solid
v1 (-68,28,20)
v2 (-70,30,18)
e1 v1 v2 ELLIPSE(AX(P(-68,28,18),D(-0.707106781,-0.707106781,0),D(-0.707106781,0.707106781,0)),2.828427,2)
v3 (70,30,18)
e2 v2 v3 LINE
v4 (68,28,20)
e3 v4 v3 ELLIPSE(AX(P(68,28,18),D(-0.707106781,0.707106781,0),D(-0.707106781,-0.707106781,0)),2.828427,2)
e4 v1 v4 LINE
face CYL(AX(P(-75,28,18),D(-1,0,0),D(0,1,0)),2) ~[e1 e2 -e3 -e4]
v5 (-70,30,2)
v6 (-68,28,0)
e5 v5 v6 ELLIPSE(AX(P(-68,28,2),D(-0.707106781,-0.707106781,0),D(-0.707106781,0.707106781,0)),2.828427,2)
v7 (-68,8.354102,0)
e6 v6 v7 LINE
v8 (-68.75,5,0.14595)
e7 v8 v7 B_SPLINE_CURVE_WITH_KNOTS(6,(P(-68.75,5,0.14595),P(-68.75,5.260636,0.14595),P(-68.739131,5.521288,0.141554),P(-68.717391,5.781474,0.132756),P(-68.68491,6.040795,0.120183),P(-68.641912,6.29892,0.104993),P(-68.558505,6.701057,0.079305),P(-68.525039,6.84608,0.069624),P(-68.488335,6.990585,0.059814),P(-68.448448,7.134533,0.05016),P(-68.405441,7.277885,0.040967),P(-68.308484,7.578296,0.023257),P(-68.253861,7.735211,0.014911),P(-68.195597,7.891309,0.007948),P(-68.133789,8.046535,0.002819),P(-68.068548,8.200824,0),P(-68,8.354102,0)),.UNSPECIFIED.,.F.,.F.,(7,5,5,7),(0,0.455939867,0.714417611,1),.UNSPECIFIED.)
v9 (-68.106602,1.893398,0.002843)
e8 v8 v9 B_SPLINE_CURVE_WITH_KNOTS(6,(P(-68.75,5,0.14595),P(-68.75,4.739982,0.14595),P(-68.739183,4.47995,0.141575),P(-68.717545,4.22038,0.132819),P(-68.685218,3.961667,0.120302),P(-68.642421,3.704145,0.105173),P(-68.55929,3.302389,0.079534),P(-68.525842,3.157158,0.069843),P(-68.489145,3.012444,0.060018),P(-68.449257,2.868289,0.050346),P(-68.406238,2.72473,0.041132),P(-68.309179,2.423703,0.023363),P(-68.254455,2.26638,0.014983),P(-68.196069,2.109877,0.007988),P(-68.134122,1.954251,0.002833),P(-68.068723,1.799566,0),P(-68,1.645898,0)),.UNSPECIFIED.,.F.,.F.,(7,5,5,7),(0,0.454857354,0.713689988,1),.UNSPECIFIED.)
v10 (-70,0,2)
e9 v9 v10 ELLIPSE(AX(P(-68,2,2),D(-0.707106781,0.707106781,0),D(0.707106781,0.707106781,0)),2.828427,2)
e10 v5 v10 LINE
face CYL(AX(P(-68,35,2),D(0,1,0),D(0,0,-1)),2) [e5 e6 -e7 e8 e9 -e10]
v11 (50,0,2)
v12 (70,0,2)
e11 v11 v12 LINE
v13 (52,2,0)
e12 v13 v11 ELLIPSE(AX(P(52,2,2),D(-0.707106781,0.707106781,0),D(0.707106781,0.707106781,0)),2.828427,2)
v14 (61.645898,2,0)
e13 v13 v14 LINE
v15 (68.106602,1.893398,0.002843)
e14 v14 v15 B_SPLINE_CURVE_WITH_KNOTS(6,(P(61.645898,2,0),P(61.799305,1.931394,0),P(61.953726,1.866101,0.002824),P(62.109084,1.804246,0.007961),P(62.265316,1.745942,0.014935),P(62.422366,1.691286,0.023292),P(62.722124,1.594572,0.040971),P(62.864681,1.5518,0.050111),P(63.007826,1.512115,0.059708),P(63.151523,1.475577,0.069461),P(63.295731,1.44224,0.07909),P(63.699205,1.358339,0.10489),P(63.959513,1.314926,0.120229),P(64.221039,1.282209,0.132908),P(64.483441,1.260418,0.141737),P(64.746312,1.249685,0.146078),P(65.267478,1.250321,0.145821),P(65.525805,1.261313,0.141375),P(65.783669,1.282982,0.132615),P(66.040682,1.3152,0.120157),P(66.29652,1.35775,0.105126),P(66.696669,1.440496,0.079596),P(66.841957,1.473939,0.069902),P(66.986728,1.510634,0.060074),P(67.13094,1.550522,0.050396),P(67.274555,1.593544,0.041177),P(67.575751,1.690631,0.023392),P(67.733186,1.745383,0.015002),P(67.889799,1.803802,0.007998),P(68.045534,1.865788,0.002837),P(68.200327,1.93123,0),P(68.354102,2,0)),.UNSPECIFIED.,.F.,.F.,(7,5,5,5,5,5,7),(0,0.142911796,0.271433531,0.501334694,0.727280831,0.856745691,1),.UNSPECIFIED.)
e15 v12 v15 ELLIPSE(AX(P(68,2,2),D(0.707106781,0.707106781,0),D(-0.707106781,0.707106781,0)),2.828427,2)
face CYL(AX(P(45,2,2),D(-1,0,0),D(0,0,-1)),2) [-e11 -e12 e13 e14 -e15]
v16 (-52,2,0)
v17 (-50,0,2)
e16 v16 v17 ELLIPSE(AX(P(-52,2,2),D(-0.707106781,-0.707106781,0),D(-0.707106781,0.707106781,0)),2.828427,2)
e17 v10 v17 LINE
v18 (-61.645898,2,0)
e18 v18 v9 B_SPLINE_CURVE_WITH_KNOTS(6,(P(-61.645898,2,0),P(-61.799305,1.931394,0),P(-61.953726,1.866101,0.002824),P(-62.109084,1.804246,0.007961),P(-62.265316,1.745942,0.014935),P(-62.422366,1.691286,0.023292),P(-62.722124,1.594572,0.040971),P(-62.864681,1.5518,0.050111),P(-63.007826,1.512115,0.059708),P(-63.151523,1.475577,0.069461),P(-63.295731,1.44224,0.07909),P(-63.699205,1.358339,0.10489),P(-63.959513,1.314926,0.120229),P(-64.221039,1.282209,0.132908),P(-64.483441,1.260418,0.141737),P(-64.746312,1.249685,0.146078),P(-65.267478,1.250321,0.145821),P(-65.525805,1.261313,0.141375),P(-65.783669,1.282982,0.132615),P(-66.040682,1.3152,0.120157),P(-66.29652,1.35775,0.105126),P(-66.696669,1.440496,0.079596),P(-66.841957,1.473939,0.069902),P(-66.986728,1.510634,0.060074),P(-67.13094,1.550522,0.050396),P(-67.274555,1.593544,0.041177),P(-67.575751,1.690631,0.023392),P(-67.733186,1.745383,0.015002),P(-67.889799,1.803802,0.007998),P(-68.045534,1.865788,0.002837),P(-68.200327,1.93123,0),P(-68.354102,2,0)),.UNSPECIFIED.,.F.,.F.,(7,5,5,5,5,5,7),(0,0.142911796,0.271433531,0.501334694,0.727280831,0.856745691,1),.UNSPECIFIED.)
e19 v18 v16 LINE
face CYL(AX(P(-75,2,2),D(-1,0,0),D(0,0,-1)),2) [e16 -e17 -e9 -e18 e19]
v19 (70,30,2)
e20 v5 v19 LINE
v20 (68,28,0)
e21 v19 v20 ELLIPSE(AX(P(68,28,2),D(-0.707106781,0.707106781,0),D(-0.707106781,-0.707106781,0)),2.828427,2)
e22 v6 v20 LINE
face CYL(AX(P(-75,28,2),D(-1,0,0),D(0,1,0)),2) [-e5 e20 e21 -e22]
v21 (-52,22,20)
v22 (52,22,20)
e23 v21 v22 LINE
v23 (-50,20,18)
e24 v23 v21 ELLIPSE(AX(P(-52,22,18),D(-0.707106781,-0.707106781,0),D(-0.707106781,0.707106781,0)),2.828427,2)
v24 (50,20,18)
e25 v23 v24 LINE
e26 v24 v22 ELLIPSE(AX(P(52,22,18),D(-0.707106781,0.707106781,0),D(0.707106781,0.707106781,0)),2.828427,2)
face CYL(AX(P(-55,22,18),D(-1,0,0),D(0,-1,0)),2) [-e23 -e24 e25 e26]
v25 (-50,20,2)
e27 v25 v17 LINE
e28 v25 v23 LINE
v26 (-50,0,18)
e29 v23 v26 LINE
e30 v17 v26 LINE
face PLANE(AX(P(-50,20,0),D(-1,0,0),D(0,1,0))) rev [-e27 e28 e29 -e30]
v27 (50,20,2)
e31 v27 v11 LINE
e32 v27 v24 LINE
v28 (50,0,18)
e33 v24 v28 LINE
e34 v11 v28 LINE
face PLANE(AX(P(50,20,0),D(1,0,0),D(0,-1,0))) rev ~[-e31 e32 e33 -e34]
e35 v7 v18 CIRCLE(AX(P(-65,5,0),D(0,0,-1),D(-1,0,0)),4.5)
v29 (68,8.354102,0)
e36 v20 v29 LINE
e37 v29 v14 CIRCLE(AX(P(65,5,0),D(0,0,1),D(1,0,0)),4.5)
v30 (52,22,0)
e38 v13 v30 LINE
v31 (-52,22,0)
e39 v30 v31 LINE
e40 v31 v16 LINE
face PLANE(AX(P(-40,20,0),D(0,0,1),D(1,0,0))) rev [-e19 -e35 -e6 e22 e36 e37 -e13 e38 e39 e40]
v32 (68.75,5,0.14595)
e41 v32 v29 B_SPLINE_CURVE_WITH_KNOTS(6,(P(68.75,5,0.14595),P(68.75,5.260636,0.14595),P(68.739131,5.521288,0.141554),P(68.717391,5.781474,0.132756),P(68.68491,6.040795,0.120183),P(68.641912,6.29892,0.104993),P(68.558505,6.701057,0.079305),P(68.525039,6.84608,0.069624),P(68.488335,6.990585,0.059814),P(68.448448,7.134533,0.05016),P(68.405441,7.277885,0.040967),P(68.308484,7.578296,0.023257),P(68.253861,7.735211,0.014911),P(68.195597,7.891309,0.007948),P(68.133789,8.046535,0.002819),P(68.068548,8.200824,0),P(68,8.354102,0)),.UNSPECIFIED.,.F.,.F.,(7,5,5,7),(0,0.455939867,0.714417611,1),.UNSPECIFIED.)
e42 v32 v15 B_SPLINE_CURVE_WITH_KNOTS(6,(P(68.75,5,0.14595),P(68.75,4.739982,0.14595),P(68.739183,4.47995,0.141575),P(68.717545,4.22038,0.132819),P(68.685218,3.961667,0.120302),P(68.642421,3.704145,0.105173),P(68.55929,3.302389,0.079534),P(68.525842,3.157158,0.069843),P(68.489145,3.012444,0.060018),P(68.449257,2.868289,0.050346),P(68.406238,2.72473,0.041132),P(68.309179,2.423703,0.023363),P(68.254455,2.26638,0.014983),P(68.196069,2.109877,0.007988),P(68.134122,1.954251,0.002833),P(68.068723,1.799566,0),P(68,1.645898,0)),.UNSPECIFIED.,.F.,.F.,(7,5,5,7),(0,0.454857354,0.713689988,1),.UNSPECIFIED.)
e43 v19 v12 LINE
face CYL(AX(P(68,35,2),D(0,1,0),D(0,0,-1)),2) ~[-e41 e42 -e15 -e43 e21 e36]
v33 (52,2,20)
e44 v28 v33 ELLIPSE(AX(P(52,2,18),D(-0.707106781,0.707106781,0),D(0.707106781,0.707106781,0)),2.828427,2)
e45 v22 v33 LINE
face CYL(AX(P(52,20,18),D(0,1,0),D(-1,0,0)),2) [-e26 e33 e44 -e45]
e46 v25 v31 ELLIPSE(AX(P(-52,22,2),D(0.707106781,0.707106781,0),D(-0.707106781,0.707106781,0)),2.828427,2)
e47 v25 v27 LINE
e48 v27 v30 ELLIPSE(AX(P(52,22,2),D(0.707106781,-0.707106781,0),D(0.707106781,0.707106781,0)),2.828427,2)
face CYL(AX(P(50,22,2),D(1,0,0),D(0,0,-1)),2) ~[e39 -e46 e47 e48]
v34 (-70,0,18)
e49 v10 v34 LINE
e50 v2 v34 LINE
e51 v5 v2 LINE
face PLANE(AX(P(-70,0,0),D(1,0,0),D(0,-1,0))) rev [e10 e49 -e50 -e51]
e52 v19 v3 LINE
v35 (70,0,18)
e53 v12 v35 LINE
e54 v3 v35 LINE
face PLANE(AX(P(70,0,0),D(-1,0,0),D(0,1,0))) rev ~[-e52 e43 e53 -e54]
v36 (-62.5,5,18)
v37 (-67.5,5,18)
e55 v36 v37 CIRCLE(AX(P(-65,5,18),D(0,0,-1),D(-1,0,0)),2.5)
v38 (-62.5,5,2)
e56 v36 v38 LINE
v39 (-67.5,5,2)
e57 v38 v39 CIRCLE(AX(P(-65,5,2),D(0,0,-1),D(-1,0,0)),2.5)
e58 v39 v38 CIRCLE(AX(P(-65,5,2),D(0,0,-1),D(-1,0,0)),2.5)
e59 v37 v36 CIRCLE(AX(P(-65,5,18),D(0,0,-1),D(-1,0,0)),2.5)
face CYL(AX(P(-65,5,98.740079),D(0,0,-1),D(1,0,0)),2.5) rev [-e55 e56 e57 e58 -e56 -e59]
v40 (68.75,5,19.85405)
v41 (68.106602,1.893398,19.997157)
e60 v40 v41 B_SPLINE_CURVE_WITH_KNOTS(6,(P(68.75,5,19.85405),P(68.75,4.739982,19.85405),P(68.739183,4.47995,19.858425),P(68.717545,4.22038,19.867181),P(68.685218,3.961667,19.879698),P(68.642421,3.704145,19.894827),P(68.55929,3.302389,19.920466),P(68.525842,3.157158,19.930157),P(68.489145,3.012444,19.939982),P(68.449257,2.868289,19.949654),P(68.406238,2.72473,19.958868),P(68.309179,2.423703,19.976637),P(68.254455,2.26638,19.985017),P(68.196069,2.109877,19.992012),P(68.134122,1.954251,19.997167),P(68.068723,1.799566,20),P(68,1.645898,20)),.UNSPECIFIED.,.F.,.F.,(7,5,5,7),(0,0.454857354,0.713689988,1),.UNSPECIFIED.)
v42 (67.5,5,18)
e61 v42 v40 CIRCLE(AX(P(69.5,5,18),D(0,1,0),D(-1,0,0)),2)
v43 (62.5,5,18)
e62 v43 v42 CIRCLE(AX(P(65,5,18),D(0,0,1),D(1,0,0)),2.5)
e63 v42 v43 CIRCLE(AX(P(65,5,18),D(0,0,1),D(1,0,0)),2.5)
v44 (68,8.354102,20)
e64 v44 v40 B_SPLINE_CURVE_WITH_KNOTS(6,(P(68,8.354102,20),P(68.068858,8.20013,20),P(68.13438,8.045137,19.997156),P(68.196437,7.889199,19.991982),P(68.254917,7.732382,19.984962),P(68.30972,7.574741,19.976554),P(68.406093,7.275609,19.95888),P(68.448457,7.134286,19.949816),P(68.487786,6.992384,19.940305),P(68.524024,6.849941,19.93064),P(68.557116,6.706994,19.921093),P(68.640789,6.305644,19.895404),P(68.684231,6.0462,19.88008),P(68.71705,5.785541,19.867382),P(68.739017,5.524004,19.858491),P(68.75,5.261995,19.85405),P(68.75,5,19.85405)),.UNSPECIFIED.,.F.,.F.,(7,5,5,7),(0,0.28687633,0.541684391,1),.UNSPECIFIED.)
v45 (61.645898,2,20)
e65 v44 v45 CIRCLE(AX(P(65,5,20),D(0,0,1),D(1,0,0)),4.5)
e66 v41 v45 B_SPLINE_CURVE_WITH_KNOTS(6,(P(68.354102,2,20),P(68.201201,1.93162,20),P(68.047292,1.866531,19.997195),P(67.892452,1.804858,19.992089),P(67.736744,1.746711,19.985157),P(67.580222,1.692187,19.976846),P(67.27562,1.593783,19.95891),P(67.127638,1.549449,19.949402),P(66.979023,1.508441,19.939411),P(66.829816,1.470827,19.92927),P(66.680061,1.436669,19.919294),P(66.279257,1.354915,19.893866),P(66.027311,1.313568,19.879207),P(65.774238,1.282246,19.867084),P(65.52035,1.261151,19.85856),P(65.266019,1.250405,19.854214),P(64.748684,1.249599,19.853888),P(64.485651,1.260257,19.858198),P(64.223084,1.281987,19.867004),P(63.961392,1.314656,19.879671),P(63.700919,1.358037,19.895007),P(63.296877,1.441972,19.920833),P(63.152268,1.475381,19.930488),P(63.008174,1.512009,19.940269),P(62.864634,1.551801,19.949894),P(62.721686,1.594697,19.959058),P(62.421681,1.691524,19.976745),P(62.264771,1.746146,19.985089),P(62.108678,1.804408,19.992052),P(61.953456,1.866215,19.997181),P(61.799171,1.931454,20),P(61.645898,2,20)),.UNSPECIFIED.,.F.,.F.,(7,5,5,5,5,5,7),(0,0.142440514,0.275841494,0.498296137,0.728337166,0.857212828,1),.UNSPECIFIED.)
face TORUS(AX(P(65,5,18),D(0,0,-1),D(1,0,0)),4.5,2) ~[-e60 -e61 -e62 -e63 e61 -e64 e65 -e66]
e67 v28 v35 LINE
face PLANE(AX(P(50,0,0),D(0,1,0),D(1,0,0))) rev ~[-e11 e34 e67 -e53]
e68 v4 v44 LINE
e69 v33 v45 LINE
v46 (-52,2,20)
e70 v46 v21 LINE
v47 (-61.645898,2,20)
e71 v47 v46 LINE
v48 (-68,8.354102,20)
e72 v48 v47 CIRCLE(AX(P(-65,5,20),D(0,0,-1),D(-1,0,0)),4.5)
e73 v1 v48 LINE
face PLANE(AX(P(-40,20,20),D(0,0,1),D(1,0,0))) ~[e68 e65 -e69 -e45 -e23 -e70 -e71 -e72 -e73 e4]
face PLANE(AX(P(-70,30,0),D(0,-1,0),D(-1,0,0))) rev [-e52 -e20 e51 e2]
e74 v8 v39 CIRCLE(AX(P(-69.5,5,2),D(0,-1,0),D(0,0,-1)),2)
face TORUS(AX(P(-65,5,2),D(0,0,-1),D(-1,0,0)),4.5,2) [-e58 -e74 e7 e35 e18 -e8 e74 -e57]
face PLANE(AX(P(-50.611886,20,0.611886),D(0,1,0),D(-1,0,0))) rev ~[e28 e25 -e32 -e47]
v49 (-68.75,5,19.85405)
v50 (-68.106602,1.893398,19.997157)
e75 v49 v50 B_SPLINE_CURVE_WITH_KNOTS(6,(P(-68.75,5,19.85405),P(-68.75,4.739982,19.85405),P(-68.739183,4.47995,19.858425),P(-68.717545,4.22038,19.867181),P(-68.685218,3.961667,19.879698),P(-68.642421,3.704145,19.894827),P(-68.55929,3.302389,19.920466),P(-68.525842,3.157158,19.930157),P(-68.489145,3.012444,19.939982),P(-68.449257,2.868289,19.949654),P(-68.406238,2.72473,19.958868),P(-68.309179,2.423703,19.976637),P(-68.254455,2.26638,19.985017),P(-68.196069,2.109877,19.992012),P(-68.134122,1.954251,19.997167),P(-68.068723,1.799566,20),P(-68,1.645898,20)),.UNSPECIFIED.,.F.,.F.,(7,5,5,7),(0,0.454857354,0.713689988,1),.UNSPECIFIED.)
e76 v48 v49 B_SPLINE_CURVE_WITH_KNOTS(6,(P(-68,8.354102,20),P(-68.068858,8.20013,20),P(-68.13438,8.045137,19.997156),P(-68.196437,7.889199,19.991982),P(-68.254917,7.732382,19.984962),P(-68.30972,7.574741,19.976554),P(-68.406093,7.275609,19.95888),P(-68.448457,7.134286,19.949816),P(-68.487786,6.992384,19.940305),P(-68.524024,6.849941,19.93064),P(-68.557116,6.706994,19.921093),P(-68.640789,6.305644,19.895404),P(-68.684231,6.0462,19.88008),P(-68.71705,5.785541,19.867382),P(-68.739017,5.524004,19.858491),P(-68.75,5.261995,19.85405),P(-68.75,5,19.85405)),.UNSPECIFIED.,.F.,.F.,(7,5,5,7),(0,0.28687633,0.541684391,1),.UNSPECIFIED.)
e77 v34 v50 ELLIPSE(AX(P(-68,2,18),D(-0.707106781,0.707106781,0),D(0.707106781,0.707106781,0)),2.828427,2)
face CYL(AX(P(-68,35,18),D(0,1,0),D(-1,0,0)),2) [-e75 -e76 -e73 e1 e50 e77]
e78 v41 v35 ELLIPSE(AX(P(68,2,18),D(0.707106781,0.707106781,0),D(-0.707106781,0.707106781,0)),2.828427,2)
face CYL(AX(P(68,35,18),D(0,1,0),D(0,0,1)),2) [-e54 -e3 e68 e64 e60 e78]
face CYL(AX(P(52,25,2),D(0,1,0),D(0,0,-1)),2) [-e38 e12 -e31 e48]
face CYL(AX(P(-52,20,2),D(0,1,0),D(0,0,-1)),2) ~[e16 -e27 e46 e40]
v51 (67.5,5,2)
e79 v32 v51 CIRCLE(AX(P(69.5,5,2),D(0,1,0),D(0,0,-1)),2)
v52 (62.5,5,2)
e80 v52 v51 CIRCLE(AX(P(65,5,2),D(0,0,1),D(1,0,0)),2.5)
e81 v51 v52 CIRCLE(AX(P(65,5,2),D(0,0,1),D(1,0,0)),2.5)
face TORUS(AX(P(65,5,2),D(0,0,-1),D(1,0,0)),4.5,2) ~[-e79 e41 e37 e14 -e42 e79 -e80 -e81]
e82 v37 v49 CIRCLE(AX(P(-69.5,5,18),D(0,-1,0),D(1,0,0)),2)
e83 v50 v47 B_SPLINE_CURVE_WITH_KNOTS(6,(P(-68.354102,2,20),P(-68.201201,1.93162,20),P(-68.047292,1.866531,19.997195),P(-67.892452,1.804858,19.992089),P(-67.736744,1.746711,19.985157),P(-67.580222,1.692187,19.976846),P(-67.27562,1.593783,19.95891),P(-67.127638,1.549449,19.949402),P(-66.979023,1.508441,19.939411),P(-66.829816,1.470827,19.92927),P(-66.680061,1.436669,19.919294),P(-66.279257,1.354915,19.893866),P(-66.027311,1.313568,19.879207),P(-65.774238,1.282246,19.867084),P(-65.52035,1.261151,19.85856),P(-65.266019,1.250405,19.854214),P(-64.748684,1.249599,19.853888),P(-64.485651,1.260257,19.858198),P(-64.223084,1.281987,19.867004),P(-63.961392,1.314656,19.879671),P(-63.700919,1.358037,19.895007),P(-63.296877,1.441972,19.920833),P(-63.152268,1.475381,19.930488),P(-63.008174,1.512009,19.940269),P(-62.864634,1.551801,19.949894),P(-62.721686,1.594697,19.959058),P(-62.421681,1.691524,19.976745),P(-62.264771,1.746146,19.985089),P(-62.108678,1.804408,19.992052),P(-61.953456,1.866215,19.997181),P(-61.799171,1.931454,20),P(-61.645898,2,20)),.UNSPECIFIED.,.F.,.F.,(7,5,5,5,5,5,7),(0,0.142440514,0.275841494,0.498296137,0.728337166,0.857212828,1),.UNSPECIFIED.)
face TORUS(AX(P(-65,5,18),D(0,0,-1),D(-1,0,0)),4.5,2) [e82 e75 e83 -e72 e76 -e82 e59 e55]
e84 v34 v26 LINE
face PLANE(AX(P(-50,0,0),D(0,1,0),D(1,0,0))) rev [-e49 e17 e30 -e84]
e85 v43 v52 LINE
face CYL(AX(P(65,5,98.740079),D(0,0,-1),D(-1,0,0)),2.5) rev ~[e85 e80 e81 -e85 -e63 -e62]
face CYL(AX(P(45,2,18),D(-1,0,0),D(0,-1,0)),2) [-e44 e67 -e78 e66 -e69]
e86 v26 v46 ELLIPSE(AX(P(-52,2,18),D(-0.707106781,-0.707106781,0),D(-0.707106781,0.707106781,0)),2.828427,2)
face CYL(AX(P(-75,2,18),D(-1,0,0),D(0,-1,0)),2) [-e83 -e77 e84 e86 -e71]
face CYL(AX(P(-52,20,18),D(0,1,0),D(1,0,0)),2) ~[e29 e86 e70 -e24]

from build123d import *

# Parameters (mm, degrees)
F1_DEPTH     = 20
F3_D         = 5
F5_T1_DEPTH  = 150
F5_T3_DEPTH  = 40
F5_T5_DEPTH  = 30
F5_T7_DEPTH  = 25
F5_T9_DEPTH  = 100
F5_T11_DEPTH = 30
F5_T25_DEPTH = 105
F5_T29_DEPTH = 30
F5_T36_DEPTH = 30
F5_T40_DEPTH = 105
F5_T47_DEPTH = 30
F5_T51_DEPTH = 105
F5_T58_DEPTH = 105
F5_T62_DEPTH = 30


# Not quite as in the source:
# - a fillet or chamfer that OpenCascade refuses, or shapes differently, is made with other operations: its cross-section is extruded or revolved along the edge and cut away or added


with BuildPart() as f1:
    # F0 (on Top) → F1 (new body)
    with BuildSketch(Plane.XY):
        Polygon((0, 30), (0, 20), (50, 20), (50, 0), (70, 0), (70, 30), align=None)
    extrude(amount=F1_DEPTH)

    # F3 (through all)
    with Locations(Plane.XY.offset(20)):
        with Locations((65, 5)):
            Hole(F3_D / 2)

    # F4: F1 across face


with BuildPart() as f1_1:
    add(f1.part)
    add(f1.part.mirror(Plane(origin=(0, 25, 10), x_dir=(0, -1, 0), z_dir=(-1, 0, 0))))

    # F5: fillet of radius 2 on 20 edges, made by hand

    # F5_s2 → F5_t1 (cut)
    with BuildSketch(Plane.YZ.offset(-75)):
        with BuildLine():
            ThreePointArc((30, 18), (29.4142135624, 19.4142135624), (28, 20))
            Line((28, 20), (30, 20))
            Line((30, 20), (30, 18))
        make_face()
        with BuildLine():
            ThreePointArc((30, 2), (29.4142135624, 0.5857864376), (28, 0))
            Line((28, 0), (30, 0))
            Line((30, 0), (30, 2))
        make_face()
    extrude(amount=F5_T1_DEPTH, mode=Mode.SUBTRACT)

    # F5_s4 → F5_t3 (cut)
    with BuildSketch(Plane.XZ.offset(-35)):
        with BuildLine():
            ThreePointArc((-70, 18), (-69.4142135624, 19.4142135624), (-68, 20))
            Line((-68, 20), (-70, 20))
            Line((-70, 20), (-70, 18))
        make_face()
        with BuildLine():
            ThreePointArc((68, 20), (69.4142135624, 19.4142135624), (70, 18))
            Line((70, 18), (70, 20))
            Line((70, 20), (68, 20))
        make_face()
        with BuildLine():
            ThreePointArc((-68, 0), (-69.4142135624, 0.5857864376), (-70, 2))
            Line((-70, 2), (-70, 0))
            Line((-70, 0), (-68, 0))
        make_face()
        with BuildLine():
            ThreePointArc((68, 0), (69.4142135624, 0.5857864376), (70, 2))
            Line((70, 2), (70, 0))
            Line((70, 0), (68, 0))
        make_face()
    extrude(amount=F5_T3_DEPTH, mode=Mode.SUBTRACT)

    # F5_s6 → F5_t5 (cut)
    with BuildSketch(Plane.YZ.offset(-75)):
        with BuildLine():
            ThreePointArc((0, 18), (0.5857864376, 19.4142135624), (2, 20))
            Line((2, 20), (0, 20))
            Line((0, 20), (0, 18))
        make_face()
        with BuildLine():
            ThreePointArc((2, 0), (0.5857864376, 0.5857864376), (0, 2))
            Line((0, 2), (0, 0))
            Line((0, 0), (2, 0))
        make_face()
    extrude(amount=F5_T5_DEPTH, mode=Mode.SUBTRACT)

    # F5_s8 → F5_t7 (cut)
    with BuildSketch(Plane.XZ.offset(-20)):
        with BuildLine():
            ThreePointArc((-50, 18), (-50.5857864376, 19.4142135624), (-52, 20))
            Line((-52, 20), (-50, 20))
            Line((-50, 20), (-50, 18))
        make_face()
        with BuildLine():
            ThreePointArc((50, 18), (50.5857864376, 19.4142135624), (52, 20))
            Line((52, 20), (50, 20))
            Line((50, 20), (50, 18))
        make_face()
        with BuildLine():
            ThreePointArc((-52, 0), (-50.5857864376, 0.5857864376), (-50, 2))
            Line((-50, 2), (-50, 0))
            Line((-50, 0), (-52, 0))
        make_face()
        with BuildLine():
            ThreePointArc((52, 0), (50.5857864376, 0.5857864376), (50, 2))
            Line((50, 2), (50, 0))
            Line((50, 0), (52, 0))
        make_face()
    extrude(amount=F5_T7_DEPTH, mode=Mode.SUBTRACT)

    # F5_s10 → F5_t9 (cut)
    with BuildSketch(Plane.YZ.offset(-50)):
        with BuildLine():
            ThreePointArc((20, 18), (20.5857864376, 19.4142135624), (22, 20))
            Line((22, 20), (20, 20))
            Line((20, 20), (20, 18))
        make_face()
        with BuildLine():
            ThreePointArc((22, 0), (20.5857864376, 0.5857864376), (20, 2))
            Line((20, 2), (20, 0))
            Line((20, 0), (22, 0))
        make_face()
    extrude(amount=F5_T9_DEPTH, mode=Mode.SUBTRACT)

    # F5_s12 → F5_t11 (cut)
    with BuildSketch(Plane.YZ.offset(45)):
        with BuildLine():
            ThreePointArc((0, 18), (0.5857864376, 19.4142135624), (2, 20))
            Line((2, 20), (0, 20))
            Line((0, 20), (0, 18))
        make_face()
        with BuildLine():
            ThreePointArc((2, 0), (0.5857864376, 0.5857864376), (0, 2))
            Line((0, 2), (0, 0))
            Line((0, 0), (2, 0))
        make_face()
    extrude(amount=F5_T11_DEPTH, mode=Mode.SUBTRACT)

    # F5_s13 → F5_t14 (revolve, cut)
    with BuildSketch(Plane.XZ.offset(-5)):
        with BuildLine():
            ThreePointArc((67.5, 18), (68.0857864376, 19.4142135624), (69.5, 20))
            Line((69.5, 20), (67.5, 20))
            Line((67.5, 20), (67.5, 18))
        make_face()
    revolve(axis=Axis((65, 5, 20), (0, 0, 1)), mode=Mode.SUBTRACT)

    # F5_s15 → F5_t16 (revolve, cut)
    with BuildSketch(Plane.XZ.offset(-5)):
        with BuildLine():
            ThreePointArc((-67.5, 18), (-68.0857864376, 19.4142135624), (-69.5, 20))
            Line((-69.5, 20), (-67.5, 20))
            Line((-67.5, 20), (-67.5, 18))
        make_face()
    revolve(axis=Axis((-65, 5, 20), (0, 0, -1)), mode=Mode.SUBTRACT)

    # F5_s17 → F5_t18 (revolve, cut)
    with BuildSketch(Plane.XZ.offset(-5)):
        with BuildLine():
            ThreePointArc((69.5, 0), (68.0857864376, 0.5857864376), (67.5, 2))
            Line((67.5, 2), (67.5, 0))
            Line((67.5, 0), (69.5, 0))
        make_face()
    revolve(axis=Axis((65, 5, 0), (0, 0, 1)), mode=Mode.SUBTRACT)

    # F5_s19 → F5_t20 (revolve, cut)
    with BuildSketch(Plane.XZ.offset(-5)):
        with BuildLine():
            ThreePointArc((-69.5, 0), (-68.0857864376, 0.5857864376), (-67.5, 2))
            Line((-67.5, 2), (-67.5, 0))
            Line((-67.5, 0), (-69.5, 0))
        make_face()
    revolve(axis=Axis((-65, 5, 0), (0, 0, -1)), mode=Mode.SUBTRACT)


with BuildPart() as f5_tool23:
    # F5_s24 → F5_t25 (new body)
    with BuildSketch(Plane.YZ.offset(-55)):
        with BuildLine():
            ThreePointArc((20, 18), (20.5857864376, 19.4142135624), (22, 20))
            Line((22, 20), (20, 20))
            Line((20, 20), (20, 18))
        make_face()
    extrude(amount=F5_T25_DEPTH)

    split(bisect_by=Plane.YZ.offset(-50), keep=Keep.BOTTOM)


with BuildPart() as f5_tool27:
    # F5_s28 → F5_t29 (new body)
    with BuildSketch(Plane.XZ.offset(-25)):
        with BuildLine():
            ThreePointArc((-50, 18), (-50.5857864376, 19.4142135624), (-52, 20))
            Line((-52, 20), (-50, 20))
            Line((-50, 20), (-50, 18))
        make_face()
    extrude(amount=F5_T29_DEPTH)

    split(bisect_by=Plane.XZ.offset(-20), keep=Keep.BOTTOM)


with BuildPart() as f5_tool23_1:
    add(f5_tool23.part)

    # F5_t31: intersect F5_tool27
    add(f5_tool27.part, mode=Mode.INTERSECT)


with BuildPart() as f1_2:
    add(f1_1.part)

    # F5_t21: cut F5_tool23
    add(f5_tool23_1.part, mode=Mode.SUBTRACT)


with BuildPart() as f5_tool34:
    # F5_s35 → F5_t36 (new body)
    with BuildSketch(Plane.XZ.offset(-25)):
        with BuildLine():
            ThreePointArc((50, 18), (50.5857864376, 19.4142135624), (52, 20))
            Line((52, 20), (50, 20))
            Line((50, 20), (50, 18))
        make_face()
    extrude(amount=F5_T36_DEPTH)

    split(bisect_by=Plane.XZ.offset(-20), keep=Keep.BOTTOM)


with BuildPart() as f5_tool38:
    # F5_s39 → F5_t40 (new body)
    with BuildSketch(Plane.YZ.offset(-50)):
        with BuildLine():
            ThreePointArc((20, 18), (20.5857864376, 19.4142135624), (22, 20))
            Line((22, 20), (20, 20))
            Line((20, 20), (20, 18))
        make_face()
    extrude(amount=F5_T40_DEPTH)

    split(bisect_by=Plane.YZ.offset(50), keep=Keep.TOP)


with BuildPart() as f5_tool34_1:
    add(f5_tool34.part)

    # F5_t42: intersect F5_tool38
    add(f5_tool38.part, mode=Mode.INTERSECT)


with BuildPart() as f1_3:
    add(f1_2.part)

    # F5_t32: cut F5_tool34
    add(f5_tool34_1.part, mode=Mode.SUBTRACT)


with BuildPart() as f5_tool45:
    # F5_s46 → F5_t47 (new body)
    with BuildSketch(Plane.XZ.offset(-25)):
        with BuildLine():
            ThreePointArc((-52, 0), (-50.5857864376, 0.5857864376), (-50, 2))
            Line((-50, 2), (-50, 0))
            Line((-50, 0), (-52, 0))
        make_face()
    extrude(amount=F5_T47_DEPTH)

    split(bisect_by=Plane.XZ.offset(-20), keep=Keep.BOTTOM)


with BuildPart() as f5_tool49:
    # F5_s50 → F5_t51 (new body)
    with BuildSketch(Plane.YZ.offset(50)):
        with BuildLine():
            ThreePointArc((22, 0), (20.5857864376, 0.5857864376), (20, 2))
            Line((20, 2), (20, 0))
            Line((20, 0), (22, 0))
        make_face()
    extrude(amount=-F5_T51_DEPTH)

    split(bisect_by=Plane.YZ.offset(-50), keep=Keep.BOTTOM)


with BuildPart() as f5_tool45_1:
    add(f5_tool45.part)

    # F5_t53: intersect F5_tool49
    add(f5_tool49.part, mode=Mode.INTERSECT)


with BuildPart() as f1_4:
    add(f1_3.part)

    # F5_t43: cut F5_tool45
    add(f5_tool45_1.part, mode=Mode.SUBTRACT)


with BuildPart() as f5_tool56:
    # F5_s57 → F5_t58 (new body)
    with BuildSketch(Plane.YZ.offset(55)):
        with BuildLine():
            ThreePointArc((22, 0), (20.5857864376, 0.5857864376), (20, 2))
            Line((20, 2), (20, 0))
            Line((20, 0), (22, 0))
        make_face()
    extrude(amount=-F5_T58_DEPTH)

    split(bisect_by=Plane.YZ.offset(50), keep=Keep.TOP)


with BuildPart() as f5_tool60:
    # F5_s61 → F5_t62 (new body)
    with BuildSketch(Plane.XZ.offset(-25)):
        with BuildLine():
            ThreePointArc((52, 0), (50.5857864376, 0.5857864376), (50, 2))
            Line((50, 2), (50, 0))
            Line((50, 0), (52, 0))
        make_face()
    extrude(amount=F5_T62_DEPTH)

    split(bisect_by=Plane.XZ.offset(-20), keep=Keep.BOTTOM)


with BuildPart() as f5_tool56_1:
    add(f5_tool56.part)

    # F5_t64: intersect F5_tool60
    add(f5_tool60.part, mode=Mode.INTERSECT)


with BuildPart() as f1_5:
    add(f1_4.part)

    # F5_t54: cut F5_tool56
    add(f5_tool56_1.part, mode=Mode.SUBTRACT)


solid = f1_5.part
